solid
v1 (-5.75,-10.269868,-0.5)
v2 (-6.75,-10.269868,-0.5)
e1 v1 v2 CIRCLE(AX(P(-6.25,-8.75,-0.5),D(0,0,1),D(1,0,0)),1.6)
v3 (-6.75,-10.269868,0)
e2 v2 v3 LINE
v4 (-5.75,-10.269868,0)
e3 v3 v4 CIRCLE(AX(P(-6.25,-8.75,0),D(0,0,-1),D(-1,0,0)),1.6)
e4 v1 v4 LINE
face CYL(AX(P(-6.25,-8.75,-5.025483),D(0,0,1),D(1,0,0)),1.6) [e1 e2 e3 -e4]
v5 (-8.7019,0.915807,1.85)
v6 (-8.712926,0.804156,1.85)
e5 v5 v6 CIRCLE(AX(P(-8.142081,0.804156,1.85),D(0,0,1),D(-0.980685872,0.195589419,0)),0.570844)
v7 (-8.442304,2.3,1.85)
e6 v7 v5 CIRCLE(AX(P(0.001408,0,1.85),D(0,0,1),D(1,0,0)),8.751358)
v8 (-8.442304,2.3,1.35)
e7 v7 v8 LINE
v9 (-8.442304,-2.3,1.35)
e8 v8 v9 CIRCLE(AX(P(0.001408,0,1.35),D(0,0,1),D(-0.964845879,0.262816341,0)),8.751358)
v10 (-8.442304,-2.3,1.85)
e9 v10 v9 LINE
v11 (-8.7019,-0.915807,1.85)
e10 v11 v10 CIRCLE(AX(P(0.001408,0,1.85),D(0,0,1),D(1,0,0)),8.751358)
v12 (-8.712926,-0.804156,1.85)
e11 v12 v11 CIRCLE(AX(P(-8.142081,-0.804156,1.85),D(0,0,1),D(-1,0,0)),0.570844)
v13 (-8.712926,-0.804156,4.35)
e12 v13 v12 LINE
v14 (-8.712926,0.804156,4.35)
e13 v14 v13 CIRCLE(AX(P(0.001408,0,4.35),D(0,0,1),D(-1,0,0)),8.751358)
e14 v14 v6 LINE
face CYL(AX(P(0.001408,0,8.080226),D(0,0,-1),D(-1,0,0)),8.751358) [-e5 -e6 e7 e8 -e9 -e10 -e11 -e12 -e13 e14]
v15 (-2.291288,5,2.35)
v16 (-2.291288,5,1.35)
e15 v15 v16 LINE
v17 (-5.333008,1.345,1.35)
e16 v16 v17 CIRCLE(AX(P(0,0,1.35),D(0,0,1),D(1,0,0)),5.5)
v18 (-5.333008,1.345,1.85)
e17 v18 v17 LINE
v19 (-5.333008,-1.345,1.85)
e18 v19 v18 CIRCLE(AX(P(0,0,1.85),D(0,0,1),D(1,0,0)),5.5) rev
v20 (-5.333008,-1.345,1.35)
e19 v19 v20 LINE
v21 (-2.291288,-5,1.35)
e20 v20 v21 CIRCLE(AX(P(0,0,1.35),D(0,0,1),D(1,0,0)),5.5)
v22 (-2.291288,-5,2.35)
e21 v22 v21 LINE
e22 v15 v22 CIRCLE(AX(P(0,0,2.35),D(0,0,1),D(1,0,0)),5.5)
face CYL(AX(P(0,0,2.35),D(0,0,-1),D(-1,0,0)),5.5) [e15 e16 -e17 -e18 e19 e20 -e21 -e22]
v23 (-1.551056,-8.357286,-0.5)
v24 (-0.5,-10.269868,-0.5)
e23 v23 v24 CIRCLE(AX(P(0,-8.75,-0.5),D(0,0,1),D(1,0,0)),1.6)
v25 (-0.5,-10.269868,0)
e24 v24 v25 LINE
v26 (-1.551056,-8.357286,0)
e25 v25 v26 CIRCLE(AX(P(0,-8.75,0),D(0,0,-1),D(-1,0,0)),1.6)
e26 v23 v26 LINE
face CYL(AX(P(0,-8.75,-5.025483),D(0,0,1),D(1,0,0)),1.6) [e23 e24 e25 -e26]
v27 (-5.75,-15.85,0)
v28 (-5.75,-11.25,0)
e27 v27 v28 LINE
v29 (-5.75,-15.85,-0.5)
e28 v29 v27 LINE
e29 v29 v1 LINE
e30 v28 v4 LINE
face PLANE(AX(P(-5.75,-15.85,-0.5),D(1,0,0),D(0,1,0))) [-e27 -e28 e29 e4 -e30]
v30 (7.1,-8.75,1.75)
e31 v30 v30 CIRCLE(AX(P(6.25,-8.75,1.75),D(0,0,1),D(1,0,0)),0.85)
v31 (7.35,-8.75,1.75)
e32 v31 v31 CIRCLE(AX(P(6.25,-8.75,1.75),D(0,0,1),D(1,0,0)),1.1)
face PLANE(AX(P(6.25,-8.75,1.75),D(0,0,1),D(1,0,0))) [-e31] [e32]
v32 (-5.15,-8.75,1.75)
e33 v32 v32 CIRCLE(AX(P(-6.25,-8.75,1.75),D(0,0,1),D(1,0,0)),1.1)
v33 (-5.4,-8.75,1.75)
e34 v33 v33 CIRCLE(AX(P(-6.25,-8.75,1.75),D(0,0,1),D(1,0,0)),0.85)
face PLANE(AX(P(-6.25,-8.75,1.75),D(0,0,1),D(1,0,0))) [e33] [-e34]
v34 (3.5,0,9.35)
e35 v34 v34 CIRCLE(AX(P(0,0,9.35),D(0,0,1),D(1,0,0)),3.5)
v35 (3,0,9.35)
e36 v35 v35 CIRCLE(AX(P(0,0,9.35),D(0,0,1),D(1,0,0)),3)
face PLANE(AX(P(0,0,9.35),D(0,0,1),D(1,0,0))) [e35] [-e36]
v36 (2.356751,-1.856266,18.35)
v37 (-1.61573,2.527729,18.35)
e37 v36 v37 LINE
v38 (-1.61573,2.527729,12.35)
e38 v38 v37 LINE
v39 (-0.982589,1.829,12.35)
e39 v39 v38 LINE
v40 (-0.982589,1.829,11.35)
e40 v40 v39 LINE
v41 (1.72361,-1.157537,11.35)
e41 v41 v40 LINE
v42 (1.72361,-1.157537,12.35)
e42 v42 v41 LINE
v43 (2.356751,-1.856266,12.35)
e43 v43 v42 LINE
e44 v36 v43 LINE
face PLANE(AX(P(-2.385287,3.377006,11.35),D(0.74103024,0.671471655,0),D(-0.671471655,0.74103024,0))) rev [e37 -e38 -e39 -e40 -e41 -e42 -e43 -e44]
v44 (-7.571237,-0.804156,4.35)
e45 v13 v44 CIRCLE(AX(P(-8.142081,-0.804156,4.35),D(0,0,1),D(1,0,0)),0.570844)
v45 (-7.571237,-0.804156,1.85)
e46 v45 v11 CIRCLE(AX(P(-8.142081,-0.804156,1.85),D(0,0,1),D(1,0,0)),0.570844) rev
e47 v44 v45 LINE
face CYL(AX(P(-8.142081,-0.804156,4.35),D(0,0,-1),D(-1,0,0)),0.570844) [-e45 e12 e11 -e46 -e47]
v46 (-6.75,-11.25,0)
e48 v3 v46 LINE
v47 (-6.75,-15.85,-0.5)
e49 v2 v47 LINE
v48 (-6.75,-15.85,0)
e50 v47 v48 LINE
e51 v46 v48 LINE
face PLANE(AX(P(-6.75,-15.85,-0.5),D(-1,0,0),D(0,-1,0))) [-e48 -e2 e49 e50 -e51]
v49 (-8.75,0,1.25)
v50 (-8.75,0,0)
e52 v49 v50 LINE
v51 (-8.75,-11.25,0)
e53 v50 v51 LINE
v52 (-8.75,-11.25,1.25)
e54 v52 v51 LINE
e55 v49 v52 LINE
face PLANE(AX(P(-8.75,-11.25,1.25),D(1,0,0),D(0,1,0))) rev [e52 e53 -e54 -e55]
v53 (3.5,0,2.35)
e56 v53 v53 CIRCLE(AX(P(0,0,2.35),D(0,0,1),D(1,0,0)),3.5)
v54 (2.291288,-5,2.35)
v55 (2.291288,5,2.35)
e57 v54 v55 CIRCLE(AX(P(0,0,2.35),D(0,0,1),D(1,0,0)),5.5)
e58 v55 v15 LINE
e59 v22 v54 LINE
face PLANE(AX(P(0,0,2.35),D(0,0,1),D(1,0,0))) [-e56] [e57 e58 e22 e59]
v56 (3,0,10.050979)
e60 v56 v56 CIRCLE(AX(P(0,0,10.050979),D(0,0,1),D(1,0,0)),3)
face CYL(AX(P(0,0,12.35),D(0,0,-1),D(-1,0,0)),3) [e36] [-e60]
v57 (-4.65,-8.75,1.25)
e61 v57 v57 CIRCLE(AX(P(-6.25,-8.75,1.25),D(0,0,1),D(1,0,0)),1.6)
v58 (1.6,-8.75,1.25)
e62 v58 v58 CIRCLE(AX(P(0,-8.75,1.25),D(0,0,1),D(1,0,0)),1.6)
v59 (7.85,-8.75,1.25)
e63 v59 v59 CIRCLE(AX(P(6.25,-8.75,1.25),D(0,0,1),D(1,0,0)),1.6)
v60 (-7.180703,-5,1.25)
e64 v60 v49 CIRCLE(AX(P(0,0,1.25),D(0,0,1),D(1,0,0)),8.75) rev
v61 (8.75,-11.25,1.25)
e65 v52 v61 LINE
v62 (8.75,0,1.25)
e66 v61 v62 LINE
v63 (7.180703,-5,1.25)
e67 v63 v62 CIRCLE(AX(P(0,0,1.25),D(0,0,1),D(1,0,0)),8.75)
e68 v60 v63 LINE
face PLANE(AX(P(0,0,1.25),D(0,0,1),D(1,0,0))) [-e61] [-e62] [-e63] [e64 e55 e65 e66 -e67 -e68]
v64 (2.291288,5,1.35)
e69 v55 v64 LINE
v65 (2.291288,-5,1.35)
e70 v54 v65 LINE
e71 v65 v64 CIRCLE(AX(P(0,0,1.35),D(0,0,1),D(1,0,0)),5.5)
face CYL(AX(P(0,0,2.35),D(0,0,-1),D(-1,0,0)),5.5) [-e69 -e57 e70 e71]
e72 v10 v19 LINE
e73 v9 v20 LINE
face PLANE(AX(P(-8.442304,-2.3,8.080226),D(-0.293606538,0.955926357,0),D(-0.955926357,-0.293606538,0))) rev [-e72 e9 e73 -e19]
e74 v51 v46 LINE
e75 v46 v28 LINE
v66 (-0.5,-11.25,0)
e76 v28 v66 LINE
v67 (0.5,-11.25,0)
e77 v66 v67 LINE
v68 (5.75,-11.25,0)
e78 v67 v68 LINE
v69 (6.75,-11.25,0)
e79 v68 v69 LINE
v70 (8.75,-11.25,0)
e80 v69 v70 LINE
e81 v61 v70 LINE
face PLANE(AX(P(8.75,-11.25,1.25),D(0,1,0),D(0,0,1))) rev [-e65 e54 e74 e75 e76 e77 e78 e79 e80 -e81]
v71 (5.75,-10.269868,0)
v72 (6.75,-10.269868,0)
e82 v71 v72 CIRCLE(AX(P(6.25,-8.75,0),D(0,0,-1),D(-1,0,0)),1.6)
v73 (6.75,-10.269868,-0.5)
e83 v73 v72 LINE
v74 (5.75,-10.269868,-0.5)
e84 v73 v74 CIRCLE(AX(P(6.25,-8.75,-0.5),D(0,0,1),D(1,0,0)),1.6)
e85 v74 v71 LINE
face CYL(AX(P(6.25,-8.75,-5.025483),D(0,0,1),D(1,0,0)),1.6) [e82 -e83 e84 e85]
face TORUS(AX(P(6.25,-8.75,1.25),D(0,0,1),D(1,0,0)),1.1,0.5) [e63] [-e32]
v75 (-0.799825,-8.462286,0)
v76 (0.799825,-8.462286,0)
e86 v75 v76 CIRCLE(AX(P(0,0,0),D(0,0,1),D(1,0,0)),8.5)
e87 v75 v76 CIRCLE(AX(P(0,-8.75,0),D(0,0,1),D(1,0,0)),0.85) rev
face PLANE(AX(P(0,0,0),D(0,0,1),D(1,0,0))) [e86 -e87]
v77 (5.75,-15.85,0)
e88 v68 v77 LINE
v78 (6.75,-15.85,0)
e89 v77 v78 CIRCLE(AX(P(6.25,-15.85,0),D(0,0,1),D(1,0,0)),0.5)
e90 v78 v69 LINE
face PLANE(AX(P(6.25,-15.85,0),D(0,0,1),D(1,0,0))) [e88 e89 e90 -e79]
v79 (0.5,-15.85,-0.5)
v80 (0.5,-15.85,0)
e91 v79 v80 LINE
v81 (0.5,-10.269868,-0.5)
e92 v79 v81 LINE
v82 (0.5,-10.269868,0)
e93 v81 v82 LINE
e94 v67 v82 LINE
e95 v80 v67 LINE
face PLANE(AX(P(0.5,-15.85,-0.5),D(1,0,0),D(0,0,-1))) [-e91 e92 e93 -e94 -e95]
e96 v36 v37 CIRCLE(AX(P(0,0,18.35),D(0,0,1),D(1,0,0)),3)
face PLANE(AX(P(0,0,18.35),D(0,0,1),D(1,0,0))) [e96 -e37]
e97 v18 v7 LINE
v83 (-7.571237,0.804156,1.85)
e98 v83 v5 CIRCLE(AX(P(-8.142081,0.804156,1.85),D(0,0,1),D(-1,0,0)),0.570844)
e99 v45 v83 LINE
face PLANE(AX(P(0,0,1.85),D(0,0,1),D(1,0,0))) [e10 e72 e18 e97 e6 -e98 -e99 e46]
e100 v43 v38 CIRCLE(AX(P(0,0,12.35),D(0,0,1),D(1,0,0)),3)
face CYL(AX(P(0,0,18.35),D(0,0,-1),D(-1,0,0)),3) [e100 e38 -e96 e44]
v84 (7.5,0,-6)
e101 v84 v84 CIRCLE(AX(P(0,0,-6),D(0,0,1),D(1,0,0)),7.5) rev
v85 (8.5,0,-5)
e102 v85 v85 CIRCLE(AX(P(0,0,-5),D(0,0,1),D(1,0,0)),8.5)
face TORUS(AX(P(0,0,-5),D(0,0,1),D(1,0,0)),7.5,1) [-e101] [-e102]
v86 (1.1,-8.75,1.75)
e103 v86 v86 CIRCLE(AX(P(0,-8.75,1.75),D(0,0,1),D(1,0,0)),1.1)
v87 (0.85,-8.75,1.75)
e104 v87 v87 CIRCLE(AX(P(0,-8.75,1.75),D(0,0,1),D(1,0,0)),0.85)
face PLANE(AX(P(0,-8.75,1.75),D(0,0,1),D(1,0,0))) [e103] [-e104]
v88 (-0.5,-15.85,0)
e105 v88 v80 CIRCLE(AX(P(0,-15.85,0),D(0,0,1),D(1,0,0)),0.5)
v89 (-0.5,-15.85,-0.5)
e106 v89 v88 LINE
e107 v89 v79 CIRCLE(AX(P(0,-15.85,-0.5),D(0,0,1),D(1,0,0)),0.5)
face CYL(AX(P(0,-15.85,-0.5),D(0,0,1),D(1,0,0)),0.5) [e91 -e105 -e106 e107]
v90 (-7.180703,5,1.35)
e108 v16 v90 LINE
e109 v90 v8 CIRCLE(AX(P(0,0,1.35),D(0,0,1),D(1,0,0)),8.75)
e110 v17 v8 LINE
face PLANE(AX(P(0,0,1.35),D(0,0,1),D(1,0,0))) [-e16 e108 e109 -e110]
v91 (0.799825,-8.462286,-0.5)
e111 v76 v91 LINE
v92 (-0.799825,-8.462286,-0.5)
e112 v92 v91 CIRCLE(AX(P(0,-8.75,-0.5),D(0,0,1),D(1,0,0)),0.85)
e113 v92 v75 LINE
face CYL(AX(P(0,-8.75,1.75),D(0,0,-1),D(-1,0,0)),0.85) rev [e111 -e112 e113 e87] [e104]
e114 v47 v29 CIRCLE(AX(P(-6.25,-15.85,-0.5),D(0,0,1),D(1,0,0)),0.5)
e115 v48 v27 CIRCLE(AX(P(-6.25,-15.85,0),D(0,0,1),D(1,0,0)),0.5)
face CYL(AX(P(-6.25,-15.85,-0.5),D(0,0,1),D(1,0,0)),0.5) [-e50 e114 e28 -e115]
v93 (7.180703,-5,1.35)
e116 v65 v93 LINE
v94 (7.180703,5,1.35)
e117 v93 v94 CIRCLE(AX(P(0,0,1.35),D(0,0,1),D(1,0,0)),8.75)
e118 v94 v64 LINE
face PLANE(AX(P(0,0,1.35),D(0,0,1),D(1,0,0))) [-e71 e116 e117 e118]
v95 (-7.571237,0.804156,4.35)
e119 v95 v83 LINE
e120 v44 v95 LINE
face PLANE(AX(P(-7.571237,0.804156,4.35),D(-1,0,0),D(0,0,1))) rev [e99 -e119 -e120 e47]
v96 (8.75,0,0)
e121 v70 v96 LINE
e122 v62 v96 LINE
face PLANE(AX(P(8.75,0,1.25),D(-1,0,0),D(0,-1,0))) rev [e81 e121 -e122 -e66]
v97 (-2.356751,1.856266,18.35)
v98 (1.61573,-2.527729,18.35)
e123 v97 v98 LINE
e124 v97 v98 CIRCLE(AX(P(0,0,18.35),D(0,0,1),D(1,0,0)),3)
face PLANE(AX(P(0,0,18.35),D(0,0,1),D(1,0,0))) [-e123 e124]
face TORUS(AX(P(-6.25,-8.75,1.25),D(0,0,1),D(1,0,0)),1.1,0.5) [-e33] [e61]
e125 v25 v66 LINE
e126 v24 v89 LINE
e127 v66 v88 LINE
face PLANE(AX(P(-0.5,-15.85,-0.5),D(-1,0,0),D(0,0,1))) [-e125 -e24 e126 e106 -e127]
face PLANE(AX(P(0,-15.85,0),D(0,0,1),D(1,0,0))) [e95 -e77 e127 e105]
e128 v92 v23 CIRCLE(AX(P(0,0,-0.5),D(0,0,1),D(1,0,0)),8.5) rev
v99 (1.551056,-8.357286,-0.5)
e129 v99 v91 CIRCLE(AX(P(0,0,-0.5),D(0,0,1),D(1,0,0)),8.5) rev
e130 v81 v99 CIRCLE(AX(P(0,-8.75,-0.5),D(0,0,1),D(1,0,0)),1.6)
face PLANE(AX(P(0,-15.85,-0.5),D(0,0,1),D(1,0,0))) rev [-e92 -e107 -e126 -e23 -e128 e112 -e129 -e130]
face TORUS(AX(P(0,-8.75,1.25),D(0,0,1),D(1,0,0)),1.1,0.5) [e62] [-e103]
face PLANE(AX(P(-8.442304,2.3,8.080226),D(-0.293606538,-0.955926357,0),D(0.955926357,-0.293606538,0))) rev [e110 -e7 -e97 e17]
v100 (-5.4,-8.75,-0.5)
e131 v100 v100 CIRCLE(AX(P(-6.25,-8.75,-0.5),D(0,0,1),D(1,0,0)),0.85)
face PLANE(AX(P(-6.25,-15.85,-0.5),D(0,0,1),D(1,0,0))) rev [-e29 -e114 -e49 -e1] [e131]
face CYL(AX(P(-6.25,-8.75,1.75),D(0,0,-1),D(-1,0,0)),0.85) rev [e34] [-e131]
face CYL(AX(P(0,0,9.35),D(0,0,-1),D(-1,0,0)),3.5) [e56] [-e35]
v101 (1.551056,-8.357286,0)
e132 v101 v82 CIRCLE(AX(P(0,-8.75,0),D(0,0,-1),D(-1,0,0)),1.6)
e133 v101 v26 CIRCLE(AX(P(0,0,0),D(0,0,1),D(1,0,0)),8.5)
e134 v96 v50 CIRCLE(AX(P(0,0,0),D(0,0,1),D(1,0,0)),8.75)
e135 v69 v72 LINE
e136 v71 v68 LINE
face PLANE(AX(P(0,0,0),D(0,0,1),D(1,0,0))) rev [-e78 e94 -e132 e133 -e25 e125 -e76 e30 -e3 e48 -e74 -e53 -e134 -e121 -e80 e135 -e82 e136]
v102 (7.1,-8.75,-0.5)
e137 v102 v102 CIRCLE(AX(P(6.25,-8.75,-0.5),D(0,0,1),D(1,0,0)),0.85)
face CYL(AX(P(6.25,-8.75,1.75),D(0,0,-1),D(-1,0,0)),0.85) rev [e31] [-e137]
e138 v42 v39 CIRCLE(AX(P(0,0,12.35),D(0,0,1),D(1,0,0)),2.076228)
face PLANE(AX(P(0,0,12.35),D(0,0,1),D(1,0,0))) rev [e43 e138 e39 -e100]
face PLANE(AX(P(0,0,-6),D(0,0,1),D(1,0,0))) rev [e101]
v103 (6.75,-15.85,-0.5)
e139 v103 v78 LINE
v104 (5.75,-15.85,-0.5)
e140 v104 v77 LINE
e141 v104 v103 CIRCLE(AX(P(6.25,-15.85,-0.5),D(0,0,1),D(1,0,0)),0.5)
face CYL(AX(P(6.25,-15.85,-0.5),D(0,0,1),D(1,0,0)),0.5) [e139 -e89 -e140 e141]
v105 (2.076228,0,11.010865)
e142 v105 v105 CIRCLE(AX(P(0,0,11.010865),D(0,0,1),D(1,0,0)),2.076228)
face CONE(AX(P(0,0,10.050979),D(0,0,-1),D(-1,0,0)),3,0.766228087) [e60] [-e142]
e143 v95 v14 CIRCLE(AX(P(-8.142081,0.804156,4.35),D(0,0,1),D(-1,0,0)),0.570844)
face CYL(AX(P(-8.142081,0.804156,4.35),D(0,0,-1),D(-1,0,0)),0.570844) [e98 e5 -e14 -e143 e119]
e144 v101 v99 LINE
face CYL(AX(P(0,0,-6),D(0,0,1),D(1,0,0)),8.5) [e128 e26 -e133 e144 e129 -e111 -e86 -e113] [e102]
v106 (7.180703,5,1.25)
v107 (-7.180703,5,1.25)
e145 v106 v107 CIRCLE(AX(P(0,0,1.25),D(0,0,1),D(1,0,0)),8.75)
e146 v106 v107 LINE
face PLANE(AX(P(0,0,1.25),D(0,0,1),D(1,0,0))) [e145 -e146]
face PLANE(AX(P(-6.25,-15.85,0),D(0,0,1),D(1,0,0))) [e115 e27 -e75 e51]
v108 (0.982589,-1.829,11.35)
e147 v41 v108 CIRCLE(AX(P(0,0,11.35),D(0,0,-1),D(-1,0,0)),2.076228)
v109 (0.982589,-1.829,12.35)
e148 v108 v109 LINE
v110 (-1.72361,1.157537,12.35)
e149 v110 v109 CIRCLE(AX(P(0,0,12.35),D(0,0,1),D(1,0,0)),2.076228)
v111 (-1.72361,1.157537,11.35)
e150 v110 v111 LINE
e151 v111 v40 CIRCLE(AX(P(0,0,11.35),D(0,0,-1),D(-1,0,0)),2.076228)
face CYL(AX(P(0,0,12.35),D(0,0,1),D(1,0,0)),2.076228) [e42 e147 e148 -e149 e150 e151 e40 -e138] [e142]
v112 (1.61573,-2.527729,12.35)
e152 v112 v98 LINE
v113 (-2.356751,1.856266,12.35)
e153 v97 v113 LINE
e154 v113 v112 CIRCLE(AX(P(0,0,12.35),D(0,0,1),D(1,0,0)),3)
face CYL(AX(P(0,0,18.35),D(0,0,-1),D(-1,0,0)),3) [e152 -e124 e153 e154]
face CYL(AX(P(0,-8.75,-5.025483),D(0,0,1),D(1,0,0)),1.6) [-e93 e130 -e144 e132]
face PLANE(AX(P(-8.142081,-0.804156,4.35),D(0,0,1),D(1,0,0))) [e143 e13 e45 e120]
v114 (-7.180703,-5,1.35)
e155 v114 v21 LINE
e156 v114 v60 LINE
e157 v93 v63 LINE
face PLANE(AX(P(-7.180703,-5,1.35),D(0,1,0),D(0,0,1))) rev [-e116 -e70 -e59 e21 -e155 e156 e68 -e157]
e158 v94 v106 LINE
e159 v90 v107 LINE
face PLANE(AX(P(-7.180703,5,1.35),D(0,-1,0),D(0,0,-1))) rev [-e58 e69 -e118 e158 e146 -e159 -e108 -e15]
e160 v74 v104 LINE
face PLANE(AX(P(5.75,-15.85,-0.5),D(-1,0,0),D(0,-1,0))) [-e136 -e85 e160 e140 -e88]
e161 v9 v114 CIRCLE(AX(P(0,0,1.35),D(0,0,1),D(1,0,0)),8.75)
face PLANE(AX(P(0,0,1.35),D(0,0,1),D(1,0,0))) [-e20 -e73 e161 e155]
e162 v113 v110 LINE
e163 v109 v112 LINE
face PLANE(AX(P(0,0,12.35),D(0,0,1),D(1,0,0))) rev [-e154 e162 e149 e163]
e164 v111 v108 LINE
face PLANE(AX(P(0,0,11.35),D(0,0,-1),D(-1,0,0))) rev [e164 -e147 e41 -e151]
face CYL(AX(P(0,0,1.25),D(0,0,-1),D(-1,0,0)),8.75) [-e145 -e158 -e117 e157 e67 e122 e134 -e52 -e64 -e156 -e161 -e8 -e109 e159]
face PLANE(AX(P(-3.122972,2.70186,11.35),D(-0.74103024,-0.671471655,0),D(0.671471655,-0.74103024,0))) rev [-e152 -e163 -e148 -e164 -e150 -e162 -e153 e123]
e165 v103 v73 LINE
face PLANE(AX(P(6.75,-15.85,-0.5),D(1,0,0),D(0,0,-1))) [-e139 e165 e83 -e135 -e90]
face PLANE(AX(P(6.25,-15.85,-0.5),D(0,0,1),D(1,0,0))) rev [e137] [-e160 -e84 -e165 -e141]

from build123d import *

# Parameters (mm, degrees)
SKETCH1_R            = 8.5
BOSS_EXTRUDE1_DEPTH  = 6
BOSS_EXTRUDE2_DEPTH  = 1.25
SKETCH3_R            = 1.6
SKETCH3_R_2          = 0.85
BOSS_EXTRUDE3_DEPTH  = 0.5
CUT_EXTRUDE1_START   = -1.25
SKETCH5_R            = 0.85
CUT_EXTRUDE1_DEPTH   = 1.25
BOSS_EXTRUDE5_START  = -0.5
BOSS_EXTRUDE5_DEPTH  = 0.5
BOSS_EXTRUDE6_START  = 0.5
SKETCH8_R            = 1.6
SKETCH8_R_2          = 0.85
BOSS_EXTRUDE6_DEPTH  = 0.5
FILLET2_R            = 0.5
BOSS_EXTRUDE7_DEPTH  = 0.1
BOSS_EXTRUDE8_DEPTH  = 1
SKETCH11_R           = 3.5
BOSS_EXTRUDE9_DEPTH  = 7
SKETCH12_R           = 3
BOSS_EXTRUDE10_DEPTH = 3
SKETCH14_R           = 3
BOSS_EXTRUDE11_DEPTH = 6
CUT_EXTRUDE2_DEPTH   = 7
BOSS_EXTRUDE12_DEPTH = 0.5
BOSS_EXTRUDE13_DEPTH = 2.5
FILLET4_R            = 1


# Read off the part's stored shape, not the designer's step: Boss-Extrude13
with BuildPart() as part:
    # Sketch1 → Boss-Extrude1 (new body)
    with BuildSketch(Plane.XY):
        Circle(SKETCH1_R)
    extrude(amount=-BOSS_EXTRUDE1_DEPTH)

    # Sketch2 → Boss-Extrude2 (add)
    with BuildSketch(Plane.XY):
        with BuildLine():
            Line((8.75, 0), (8.75, -11.25))
            Line((8.75, -11.25), (-8.75, -11.25))
            Line((-8.75, -11.25), (-8.75, 0))
            ThreePointArc((-8.75, 0), (0, 8.75), (8.75, 0))
        make_face()
    extrude(amount=BOSS_EXTRUDE2_DEPTH)

    # Sketch3 → Boss-Extrude3 (add)
    # profile 1 of 3: a face of its own
    with BuildSketch(Plane.XY.offset(1.25)):
        with Locations((0, -8.75)):
            Circle(SKETCH3_R)
        with Locations((0, -8.75)):
            Circle(SKETCH3_R_2, mode=Mode.SUBTRACT)
    # profile 2 of 3: a face of its own
    with BuildSketch(Plane.XY.offset(1.25)):
        with Locations((6.25, -8.75)):
            Circle(SKETCH3_R)
        with Locations((6.25, -8.75)):
            Circle(SKETCH3_R_2, mode=Mode.SUBTRACT)
    # profile 3 of 3: a face of its own
    with BuildSketch(Plane.XY.offset(1.25)):
        with Locations((-6.25, -8.75)):
            Circle(SKETCH3_R)
        with Locations((-6.25, -8.75)):
            Circle(SKETCH3_R_2, mode=Mode.SUBTRACT)
    extrude(amount=BOSS_EXTRUDE3_DEPTH)

    # Sketch5 → Cut-Extrude1 (cut)
    with BuildSketch(Plane.XY.offset(1.25).offset(CUT_EXTRUDE1_START)):
        with Locations((-6.25, -8.75)):
            Circle(SKETCH5_R)
        with Locations(Location((0, -8.75, 0), (0, 0, 160.215255231))):
            Circle(SKETCH5_R)
        with Locations((6.25, -8.75)):
            Circle(SKETCH5_R)
    extrude(amount=CUT_EXTRUDE1_DEPTH, mode=Mode.SUBTRACT)

    # Sketch6 → Boss-Extrude5 (add)
    with BuildSketch(Plane.XY.offset(BOSS_EXTRUDE5_START)):
        with BuildLine():
            Line((-6.75, -15.85), (-6.75, -10.269868415))
            ThreePointArc((-6.75, -10.269868415), (-6.25, -10.35), (-5.75, -10.269868415))
            Line((-5.75, -10.269868415), (-5.75, -15.85))
            ThreePointArc((-5.75, -15.85), (-6.25, -16.35), (-6.75, -15.85))
        make_face()
        with BuildLine():
            Line((-0.5, -15.85), (-0.5, -10.269868415))
            ThreePointArc((-0.5, -10.269868415), (0, -10.35), (0.5, -10.269868415))
            Line((0.5, -10.269868415), (0.5, -15.85))
            ThreePointArc((0.5, -15.85), (0, -16.35), (-0.5, -15.85))
        make_face()
        with BuildLine():
            Line((5.75, -15.85), (5.75, -10.269868415))
            ThreePointArc((5.75, -10.269868415), (6.25, -10.35), (6.75, -10.269868415))
            Line((6.75, -10.269868415), (6.75, -15.85))
            ThreePointArc((6.75, -15.85), (6.25, -16.35), (5.75, -15.85))
        make_face()
    extrude(amount=BOSS_EXTRUDE5_DEPTH)

    # Sketch8 → Boss-Extrude6 (add)
    # profile 1 of 3: a face of its own
    with BuildSketch(Plane(origin=(0, 0, 0), x_dir=(-1, 0, 0), z_dir=(0, 0, -1)).offset(BOSS_EXTRUDE6_START)):
        with Locations(Location((-6.25, -8.75, 0), (0, 0, 180))):
            Circle(SKETCH8_R)
        with Locations(Location((-6.25, -8.75, 0), (0, 0, 180))):
            Circle(SKETCH8_R_2, mode=Mode.SUBTRACT)
    # profile 2 of 3: a face of its own
    with BuildSketch(Plane(origin=(0, 0, 0), x_dir=(-1, 0, 0), z_dir=(0, 0, -1)).offset(BOSS_EXTRUDE6_START)):
        with Locations(Location((0, -8.75, 0), (0, 0, 180))):
            Circle(SKETCH8_R)
        with Locations(Location((0, -8.75, 0), (0, 0, 19.784744769))):
            Circle(SKETCH8_R_2, mode=Mode.SUBTRACT)
    # profile 3 of 3: a face of its own
    with BuildSketch(Plane(origin=(0, 0, 0), x_dir=(-1, 0, 0), z_dir=(0, 0, -1)).offset(BOSS_EXTRUDE6_START)):
        with Locations(Location((6.25, -8.75, 0), (0, 0, 180))):
            Circle(SKETCH8_R)
        with Locations(Location((6.25, -8.75, 0), (0, 0, 180))):
            Circle(SKETCH8_R_2, mode=Mode.SUBTRACT)
    extrude(amount=-BOSS_EXTRUDE6_DEPTH)

    # Fillet2
    fillet2_edges = [part.edges().sort_by_distance(p)[0] for p in [
        (-1.6, -8.75, 1.75),
        (4.65, -8.75, 1.75),
        (-7.85, -8.75, 1.75),
    ]]
    fillet(fillet2_edges, radius=FILLET2_R - 0.0001)  # a hair under: the kernel refuses the full size

    # Sketch9 → Boss-Extrude7 (add)
    with BuildSketch(Plane.XY.offset(1.25)):
        with BuildLine():
            Line((-7.180703308, 5), (7.180703308, 5))
            ThreePointArc((7.180703308, 5), (8.75, 0), (7.180703308, -5))
            Line((7.180703308, -5), (-7.180703308, -5))
            ThreePointArc((-7.180703308, -5), (-8.75, 0), (-7.180703308, 5))
        make_face()
    extrude(amount=BOSS_EXTRUDE7_DEPTH)

    # Sketch10 → Boss-Extrude8 (add)
    with BuildSketch(Plane.XY.offset(1.35)):
        with BuildLine():
            Line((2.291287847, 5), (-2.291287847, 5))
            ThreePointArc((-2.291287847, 5), (-5.5, 0), (-2.291287847, -5))
            Line((-2.291287847, -5), (2.291287847, -5))
            ThreePointArc((2.291287847, -5), (5.5, 0), (2.291287847, 5))
        make_face()
    extrude(amount=BOSS_EXTRUDE8_DEPTH)

    # Sketch11 → Boss-Extrude9 (add)
    with BuildSketch(Plane.XY.offset(2.35)):
        Circle(SKETCH11_R)
    extrude(amount=BOSS_EXTRUDE9_DEPTH)

    # Sketch12 → Boss-Extrude10 (add)
    with BuildSketch(Plane.XY.offset(9.35)):
        Circle(SKETCH12_R)
    extrude(amount=BOSS_EXTRUDE10_DEPTH)

    # Sketch13 → Cut-Revolve2 (revolve, cut)
    with BuildSketch(Plane(origin=(0, 0, 0), x_dir=(1, 0, 0), z_dir=(0, 1, 0))):
        Polygon((2.076228104, -11.010865145), (2.076228104, -12.35), (3, -12.35), (3, -10.050978955), align=None)
    revolve(axis=Axis((0, 0, 12.35), (0, 0, -1)), mode=Mode.SUBTRACT)

    # Sketch14 → Boss-Extrude11 (add)
    with BuildSketch(Plane.XY.offset(12.35)):
        Circle(SKETCH14_R)
    extrude(amount=BOSS_EXTRUDE11_DEPTH)

    # Sketch15 → Cut-Extrude2 (cut)
    with BuildSketch(Plane.XY.offset(18.35)):
        Polygon((-3.122971825, 2.701860488), (2.385287248, -3.377006001), (3.122971825, -2.701860488), (-2.385287248, 3.377006001), align=None)
    extrude(amount=-CUT_EXTRUDE2_DEPTH, mode=Mode.SUBTRACT)

    # Sketch16 → Boss-Extrude12 (add)
    with BuildSketch(Plane.XY.offset(1.35)):
        with BuildLine():
            Line((-8.442304188, 2.3), (-5.333008063, 1.345))
            ThreePointArc((-5.333008063, 1.345), (-5.5, 0), (-5.333008063, -1.345))
            Line((-5.333008063, -1.345), (-8.442304188, -2.3))
            ThreePointArc((-8.442304188, -2.3), (-8.749950498, 0), (-8.442304188, 2.3))
        make_face()
    extrude(amount=BOSS_EXTRUDE12_DEPTH)

    # Boss-Extrude13 outline → Boss-Extrude13 (add)
    with BuildSketch(Plane.XY.offset(1.85)):
        with BuildLine():
            ThreePointArc((-8.701900167, 0.915807021), (-8.749950498, 0), (-8.701900167, -0.915807021))
            ThreePointArc((-8.701900167, -0.915807021), (-8.085984441, -1.372236974), (-7.571237459, -0.804155968))
            Line((-7.571237459, -0.804155968), (-7.571237459, 0.804155968))
            ThreePointArc((-7.571237459, 0.804155968), (-8.085984441, 1.372236974), (-8.701900167, 0.915807021))
        make_face()
    extrude(amount=BOSS_EXTRUDE13_DEPTH)

    # Fillet4
    fillet4_edges = [part.edges().sort_by_distance(p)[0] for p in [
        (-8.5, 0, -6),
    ]]
    fillet(fillet4_edges, radius=FILLET4_R)


solid = part.part
